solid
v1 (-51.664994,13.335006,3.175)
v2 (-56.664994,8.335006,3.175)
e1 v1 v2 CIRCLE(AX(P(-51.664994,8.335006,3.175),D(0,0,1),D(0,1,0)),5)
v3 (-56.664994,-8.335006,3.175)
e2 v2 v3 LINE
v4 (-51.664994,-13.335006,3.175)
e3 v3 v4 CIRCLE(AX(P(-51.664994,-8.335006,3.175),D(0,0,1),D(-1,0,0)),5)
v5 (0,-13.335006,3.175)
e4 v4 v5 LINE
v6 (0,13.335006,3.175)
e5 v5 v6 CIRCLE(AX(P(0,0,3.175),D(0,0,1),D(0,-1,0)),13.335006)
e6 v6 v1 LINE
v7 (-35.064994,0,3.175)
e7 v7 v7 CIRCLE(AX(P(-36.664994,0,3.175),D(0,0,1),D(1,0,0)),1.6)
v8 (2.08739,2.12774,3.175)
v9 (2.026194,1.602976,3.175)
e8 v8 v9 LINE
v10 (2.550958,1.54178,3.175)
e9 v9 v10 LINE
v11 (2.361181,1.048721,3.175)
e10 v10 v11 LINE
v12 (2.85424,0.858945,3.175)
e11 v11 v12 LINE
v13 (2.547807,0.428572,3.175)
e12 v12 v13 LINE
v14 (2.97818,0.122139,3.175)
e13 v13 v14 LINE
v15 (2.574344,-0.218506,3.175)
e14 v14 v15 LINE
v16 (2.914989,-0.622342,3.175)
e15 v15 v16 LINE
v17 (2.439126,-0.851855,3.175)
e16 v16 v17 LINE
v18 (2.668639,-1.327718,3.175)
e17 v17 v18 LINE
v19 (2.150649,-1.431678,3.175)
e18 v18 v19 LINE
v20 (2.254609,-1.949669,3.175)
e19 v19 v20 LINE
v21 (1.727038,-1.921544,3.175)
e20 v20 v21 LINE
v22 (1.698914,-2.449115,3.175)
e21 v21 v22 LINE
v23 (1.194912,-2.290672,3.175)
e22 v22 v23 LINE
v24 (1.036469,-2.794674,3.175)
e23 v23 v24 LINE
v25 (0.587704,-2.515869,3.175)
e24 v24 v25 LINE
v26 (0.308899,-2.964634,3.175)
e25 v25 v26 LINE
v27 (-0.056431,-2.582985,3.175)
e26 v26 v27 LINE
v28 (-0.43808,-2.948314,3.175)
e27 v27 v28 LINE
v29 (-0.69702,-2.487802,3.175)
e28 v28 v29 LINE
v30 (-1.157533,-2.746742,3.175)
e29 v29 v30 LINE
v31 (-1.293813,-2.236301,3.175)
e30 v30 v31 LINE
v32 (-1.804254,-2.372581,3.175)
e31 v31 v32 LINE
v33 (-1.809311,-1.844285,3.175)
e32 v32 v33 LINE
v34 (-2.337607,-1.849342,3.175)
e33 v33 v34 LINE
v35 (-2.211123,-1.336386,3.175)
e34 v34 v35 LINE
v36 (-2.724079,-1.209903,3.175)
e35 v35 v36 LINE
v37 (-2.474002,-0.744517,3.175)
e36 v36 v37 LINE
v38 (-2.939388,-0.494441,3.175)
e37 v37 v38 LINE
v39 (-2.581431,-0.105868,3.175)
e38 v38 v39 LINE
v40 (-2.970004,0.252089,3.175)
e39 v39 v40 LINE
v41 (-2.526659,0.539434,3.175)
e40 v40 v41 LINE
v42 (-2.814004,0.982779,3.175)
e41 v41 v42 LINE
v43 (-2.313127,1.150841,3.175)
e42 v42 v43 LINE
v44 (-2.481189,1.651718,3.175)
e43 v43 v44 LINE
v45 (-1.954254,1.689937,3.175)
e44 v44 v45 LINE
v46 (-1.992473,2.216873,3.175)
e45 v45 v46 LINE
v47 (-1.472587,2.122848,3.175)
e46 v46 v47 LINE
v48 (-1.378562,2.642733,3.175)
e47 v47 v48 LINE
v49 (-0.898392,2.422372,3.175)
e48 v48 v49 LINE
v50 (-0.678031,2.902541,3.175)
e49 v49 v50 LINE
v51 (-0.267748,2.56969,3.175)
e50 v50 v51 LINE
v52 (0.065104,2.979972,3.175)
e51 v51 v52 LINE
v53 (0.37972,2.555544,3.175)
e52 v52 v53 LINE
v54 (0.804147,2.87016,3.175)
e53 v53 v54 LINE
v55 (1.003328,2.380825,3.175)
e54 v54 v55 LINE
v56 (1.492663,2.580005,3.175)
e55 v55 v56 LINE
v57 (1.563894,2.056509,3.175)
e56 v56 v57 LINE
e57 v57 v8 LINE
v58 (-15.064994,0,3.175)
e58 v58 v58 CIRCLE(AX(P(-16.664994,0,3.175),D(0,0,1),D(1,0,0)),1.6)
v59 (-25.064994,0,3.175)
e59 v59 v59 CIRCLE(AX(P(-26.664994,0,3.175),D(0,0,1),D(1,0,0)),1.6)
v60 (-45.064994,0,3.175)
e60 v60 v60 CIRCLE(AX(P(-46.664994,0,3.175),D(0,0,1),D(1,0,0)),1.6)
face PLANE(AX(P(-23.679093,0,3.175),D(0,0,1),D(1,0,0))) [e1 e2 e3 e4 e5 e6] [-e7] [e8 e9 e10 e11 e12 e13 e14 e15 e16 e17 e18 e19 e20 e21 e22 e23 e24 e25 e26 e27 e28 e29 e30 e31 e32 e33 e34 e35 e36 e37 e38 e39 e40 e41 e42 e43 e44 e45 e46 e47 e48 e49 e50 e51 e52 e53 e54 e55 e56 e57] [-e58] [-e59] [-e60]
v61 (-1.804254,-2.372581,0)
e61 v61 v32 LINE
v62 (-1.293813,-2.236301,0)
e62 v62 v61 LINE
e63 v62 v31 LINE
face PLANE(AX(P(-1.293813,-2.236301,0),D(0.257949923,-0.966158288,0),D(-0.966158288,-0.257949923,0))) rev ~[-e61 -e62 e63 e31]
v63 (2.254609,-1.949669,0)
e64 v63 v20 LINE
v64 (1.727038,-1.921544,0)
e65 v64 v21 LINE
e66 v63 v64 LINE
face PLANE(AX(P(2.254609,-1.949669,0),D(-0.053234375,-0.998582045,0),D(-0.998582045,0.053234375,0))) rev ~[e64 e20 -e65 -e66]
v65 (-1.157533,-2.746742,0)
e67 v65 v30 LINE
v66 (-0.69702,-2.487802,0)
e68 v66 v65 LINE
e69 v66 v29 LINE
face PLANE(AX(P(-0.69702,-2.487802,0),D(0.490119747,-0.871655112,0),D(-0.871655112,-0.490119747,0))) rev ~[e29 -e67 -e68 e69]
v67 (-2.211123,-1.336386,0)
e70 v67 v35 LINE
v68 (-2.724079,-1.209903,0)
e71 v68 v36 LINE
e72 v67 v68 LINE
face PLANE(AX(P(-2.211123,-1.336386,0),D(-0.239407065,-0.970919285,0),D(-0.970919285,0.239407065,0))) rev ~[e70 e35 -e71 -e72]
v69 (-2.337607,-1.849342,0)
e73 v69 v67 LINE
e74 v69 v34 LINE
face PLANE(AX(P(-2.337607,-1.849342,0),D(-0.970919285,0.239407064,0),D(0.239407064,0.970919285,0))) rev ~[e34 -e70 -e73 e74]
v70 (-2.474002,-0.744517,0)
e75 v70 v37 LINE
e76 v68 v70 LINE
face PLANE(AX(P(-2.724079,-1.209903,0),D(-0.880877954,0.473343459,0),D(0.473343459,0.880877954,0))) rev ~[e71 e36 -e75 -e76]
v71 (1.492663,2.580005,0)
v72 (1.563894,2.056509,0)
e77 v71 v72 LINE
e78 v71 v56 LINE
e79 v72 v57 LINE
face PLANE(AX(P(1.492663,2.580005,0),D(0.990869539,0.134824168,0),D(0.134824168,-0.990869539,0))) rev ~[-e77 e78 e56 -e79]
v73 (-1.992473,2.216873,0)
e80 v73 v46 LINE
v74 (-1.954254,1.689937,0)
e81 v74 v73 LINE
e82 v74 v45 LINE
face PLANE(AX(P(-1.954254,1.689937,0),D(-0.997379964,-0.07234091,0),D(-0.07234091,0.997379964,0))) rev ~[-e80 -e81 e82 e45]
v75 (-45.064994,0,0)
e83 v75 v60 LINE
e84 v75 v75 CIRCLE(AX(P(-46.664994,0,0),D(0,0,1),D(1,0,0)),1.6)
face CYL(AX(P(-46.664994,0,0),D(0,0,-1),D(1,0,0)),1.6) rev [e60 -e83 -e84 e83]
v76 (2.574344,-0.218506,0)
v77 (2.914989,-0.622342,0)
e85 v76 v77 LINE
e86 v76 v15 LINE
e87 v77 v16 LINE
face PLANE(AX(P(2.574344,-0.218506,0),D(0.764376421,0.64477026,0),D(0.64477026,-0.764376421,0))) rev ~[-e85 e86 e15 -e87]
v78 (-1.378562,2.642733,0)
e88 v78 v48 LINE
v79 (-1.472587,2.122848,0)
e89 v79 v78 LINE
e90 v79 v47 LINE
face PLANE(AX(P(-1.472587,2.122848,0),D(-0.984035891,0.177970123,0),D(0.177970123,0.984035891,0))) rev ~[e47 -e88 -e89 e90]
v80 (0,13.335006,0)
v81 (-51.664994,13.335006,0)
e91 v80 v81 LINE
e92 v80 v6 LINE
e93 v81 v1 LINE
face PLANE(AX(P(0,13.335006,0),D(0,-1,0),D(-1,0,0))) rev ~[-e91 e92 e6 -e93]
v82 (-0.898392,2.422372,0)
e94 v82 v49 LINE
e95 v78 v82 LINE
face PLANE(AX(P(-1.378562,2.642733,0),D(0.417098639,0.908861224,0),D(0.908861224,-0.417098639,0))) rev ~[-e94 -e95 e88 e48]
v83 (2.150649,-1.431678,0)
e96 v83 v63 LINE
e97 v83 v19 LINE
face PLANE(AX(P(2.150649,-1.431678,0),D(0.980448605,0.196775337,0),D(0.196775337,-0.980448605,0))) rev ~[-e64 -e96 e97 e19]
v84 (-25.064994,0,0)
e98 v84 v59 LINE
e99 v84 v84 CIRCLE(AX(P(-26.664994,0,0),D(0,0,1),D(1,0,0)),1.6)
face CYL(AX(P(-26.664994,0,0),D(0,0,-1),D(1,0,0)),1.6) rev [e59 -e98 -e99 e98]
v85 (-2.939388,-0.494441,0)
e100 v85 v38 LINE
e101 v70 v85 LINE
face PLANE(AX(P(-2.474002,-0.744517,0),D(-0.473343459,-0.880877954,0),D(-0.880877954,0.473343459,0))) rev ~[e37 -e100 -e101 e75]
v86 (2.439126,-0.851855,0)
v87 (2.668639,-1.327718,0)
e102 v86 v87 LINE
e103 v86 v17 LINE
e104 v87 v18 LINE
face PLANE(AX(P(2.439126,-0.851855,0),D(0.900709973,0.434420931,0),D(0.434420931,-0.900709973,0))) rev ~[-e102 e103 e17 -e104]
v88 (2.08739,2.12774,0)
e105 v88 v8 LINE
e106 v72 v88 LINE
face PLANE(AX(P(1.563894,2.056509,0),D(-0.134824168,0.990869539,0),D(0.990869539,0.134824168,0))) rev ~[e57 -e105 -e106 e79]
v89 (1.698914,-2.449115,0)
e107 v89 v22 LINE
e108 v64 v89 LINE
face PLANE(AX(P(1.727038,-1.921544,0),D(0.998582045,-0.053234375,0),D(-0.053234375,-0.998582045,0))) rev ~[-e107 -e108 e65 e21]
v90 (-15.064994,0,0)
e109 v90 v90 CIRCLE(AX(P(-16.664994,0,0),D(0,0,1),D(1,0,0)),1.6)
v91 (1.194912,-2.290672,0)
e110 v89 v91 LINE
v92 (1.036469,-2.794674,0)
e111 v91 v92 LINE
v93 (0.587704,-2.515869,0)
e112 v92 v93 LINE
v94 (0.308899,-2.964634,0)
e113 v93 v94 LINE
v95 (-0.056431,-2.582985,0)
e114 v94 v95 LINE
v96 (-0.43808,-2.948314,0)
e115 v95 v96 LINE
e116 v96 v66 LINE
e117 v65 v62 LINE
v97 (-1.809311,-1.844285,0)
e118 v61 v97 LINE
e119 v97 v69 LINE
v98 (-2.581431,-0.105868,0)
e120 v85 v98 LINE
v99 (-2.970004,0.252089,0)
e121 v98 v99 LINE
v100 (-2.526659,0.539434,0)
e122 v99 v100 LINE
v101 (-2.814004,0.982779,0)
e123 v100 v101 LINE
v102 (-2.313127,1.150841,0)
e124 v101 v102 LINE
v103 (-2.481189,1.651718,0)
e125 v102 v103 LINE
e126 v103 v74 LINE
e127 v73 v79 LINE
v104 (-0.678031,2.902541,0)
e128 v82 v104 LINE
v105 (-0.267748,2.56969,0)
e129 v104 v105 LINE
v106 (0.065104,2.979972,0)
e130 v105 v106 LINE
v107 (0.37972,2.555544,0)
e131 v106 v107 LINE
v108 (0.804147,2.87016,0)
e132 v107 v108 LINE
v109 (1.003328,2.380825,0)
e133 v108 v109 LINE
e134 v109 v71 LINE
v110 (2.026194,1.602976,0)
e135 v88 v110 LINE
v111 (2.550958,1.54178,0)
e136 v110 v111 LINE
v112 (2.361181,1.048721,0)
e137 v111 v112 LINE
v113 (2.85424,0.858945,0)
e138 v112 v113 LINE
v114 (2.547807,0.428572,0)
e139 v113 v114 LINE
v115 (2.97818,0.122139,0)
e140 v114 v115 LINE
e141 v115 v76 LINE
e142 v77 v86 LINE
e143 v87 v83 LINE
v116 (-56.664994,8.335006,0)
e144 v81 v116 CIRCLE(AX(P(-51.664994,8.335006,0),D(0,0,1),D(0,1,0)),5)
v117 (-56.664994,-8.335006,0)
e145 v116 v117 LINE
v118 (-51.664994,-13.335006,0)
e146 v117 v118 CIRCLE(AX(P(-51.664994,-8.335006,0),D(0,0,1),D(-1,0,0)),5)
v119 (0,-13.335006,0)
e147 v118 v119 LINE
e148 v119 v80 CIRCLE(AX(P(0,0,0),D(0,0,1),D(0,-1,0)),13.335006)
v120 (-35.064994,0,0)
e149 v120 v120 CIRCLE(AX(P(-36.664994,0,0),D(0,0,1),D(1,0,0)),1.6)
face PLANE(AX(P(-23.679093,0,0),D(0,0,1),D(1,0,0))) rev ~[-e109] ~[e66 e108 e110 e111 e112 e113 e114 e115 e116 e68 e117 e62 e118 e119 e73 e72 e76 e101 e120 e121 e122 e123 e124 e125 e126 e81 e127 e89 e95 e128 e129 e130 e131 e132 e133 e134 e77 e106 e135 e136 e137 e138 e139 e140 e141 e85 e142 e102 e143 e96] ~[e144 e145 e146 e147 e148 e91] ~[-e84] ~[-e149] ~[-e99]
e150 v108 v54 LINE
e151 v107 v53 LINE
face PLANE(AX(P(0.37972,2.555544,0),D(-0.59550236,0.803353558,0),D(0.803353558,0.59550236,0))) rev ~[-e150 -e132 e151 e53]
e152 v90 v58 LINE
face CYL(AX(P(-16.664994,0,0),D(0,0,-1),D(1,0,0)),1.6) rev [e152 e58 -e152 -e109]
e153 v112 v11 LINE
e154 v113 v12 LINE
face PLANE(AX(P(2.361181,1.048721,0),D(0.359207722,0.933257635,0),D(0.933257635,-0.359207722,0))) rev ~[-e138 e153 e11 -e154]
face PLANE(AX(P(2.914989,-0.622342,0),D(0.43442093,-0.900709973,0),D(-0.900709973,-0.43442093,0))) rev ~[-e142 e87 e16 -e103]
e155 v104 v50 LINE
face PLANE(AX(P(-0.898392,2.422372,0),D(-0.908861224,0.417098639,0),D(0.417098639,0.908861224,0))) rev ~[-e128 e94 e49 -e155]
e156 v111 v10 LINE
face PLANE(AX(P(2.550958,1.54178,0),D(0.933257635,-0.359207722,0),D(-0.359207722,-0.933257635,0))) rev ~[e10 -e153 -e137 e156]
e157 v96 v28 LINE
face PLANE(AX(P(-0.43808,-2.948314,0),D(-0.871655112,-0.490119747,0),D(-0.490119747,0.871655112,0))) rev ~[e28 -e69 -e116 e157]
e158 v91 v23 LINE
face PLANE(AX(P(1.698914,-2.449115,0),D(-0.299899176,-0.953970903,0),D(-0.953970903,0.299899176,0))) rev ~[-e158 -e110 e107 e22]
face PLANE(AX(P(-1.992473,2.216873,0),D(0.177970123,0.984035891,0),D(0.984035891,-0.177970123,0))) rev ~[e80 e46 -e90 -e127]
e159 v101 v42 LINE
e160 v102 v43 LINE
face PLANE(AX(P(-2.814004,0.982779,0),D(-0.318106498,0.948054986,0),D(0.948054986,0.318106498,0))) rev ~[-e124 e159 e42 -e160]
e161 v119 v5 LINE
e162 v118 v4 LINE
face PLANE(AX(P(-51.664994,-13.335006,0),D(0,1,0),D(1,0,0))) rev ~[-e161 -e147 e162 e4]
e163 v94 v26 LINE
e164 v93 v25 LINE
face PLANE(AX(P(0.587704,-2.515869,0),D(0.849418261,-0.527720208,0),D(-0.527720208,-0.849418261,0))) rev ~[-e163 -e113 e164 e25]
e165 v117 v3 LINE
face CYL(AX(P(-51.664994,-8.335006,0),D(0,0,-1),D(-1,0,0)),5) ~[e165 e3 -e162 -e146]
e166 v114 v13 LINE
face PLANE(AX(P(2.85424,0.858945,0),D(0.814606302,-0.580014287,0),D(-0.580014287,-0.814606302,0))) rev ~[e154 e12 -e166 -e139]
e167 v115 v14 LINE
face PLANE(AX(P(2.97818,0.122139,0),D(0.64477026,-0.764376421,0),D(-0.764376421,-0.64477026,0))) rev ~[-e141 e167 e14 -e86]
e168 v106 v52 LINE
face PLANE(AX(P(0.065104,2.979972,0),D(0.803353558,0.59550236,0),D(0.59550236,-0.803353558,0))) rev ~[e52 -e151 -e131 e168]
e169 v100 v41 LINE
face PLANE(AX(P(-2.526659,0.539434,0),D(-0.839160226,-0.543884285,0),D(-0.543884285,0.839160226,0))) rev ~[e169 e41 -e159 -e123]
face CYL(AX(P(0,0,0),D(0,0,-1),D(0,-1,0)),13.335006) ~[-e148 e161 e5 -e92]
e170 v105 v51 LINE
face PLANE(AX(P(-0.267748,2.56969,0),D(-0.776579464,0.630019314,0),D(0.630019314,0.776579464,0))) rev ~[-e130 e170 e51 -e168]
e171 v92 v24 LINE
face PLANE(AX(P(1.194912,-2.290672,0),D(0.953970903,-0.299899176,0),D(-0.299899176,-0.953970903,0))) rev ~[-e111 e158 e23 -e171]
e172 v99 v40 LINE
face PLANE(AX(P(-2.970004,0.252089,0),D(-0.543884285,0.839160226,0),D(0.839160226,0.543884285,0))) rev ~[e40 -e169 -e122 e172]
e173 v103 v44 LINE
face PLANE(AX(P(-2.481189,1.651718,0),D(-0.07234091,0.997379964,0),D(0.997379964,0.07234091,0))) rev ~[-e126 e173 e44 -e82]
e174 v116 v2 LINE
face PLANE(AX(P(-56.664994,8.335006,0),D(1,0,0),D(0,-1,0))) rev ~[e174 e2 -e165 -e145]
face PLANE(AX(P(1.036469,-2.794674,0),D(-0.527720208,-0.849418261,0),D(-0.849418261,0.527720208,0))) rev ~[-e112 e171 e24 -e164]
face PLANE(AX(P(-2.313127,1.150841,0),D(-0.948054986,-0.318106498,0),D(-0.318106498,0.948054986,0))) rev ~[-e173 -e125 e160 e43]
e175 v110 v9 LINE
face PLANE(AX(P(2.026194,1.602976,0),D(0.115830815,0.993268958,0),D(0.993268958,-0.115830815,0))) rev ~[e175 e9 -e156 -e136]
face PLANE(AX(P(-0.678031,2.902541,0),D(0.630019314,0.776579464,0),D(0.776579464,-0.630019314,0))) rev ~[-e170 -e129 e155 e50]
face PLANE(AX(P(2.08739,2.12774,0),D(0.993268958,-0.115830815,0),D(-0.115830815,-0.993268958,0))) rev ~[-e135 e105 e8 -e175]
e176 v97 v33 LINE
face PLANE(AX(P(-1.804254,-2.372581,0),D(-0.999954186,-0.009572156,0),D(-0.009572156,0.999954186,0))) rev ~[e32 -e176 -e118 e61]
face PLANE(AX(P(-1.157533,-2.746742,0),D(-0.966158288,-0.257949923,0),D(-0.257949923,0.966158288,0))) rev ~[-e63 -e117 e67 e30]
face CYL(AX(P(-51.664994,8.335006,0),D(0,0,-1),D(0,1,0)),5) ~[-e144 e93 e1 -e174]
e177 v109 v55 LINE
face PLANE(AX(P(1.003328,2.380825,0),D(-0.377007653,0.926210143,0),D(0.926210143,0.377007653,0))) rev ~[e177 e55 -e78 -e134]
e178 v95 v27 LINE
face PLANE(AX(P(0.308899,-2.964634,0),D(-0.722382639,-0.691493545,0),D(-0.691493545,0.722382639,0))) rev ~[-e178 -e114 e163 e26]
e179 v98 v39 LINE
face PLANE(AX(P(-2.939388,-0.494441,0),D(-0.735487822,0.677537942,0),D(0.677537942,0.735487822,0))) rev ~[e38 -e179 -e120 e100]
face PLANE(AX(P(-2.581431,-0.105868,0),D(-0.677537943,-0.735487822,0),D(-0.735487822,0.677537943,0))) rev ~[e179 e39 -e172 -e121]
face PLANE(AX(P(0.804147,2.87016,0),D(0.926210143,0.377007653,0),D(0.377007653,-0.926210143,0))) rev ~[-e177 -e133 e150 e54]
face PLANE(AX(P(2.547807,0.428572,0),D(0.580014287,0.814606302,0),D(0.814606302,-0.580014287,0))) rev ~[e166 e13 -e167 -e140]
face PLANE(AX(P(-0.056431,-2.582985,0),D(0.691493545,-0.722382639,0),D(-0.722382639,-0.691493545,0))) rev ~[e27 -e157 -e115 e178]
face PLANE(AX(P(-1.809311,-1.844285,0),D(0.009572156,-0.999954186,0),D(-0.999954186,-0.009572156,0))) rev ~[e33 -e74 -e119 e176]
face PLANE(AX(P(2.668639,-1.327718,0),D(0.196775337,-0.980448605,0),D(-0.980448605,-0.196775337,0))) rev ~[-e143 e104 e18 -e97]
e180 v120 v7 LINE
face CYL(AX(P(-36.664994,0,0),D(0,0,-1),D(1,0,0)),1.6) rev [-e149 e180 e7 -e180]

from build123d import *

# Parameters (mm, degrees)
F0_R     = 1.6
F1_DEPTH = 3.175


with BuildPart() as f1:
    # F0 (on Top) → F1 (new body)
    with BuildSketch(Plane.XY):
        with BuildLine():
            Line((-51.6649944294, -13.3350055706), (0, -13.3350055706))
            ThreePointArc((0, -13.3350055706), (13.3350055706, 0), (0, 13.3350055706))
            Line((0, 13.3350055706), (-51.6649944294, 13.3350055706))
            ThreePointArc((-51.6649944294, 13.3350055706), (-55.2005283353, 11.8705394766), (-56.6649944294, 8.3350055706))
            Line((-56.6649944294, 8.3350055706), (-56.6649944294, -8.3350055706))
            ThreePointArc((-56.6649944294, -8.3350055706), (-55.2005283353, -11.8705394766), (-51.6649944294, -13.3350055706))
        make_face()
        with Locations((-46.6649944294, 0)):
            Circle(F0_R, mode=Mode.SUBTRACT)
        with Locations((-36.6649944294, 0)):
            Circle(F0_R, mode=Mode.SUBTRACT)
        with Locations((-26.6649944294, 0)):
            Circle(F0_R, mode=Mode.SUBTRACT)
        with Locations((-16.6649944294, 0)):
            Circle(F0_R, mode=Mode.SUBTRACT)
        Polygon((-2.3131272616, 1.150841372), (-2.4811892868, 1.651717782), (-1.9542535042, 1.6899369317), (-1.992472654, 2.2168727143), (-1.4725868119, 2.1228475389), (-1.3785616365, 2.6427333809), (-0.8983920744, 2.4223718279), (-0.6780305213, 2.90254139), (-0.2677480588, 2.5696895861), (0.0651037451, 2.9799720486), (0.379719552, 2.555544297), (0.8041473037, 2.8701601039), (1.0033279869, 2.380824761), (1.4926633298, 2.5800054442), (1.5638936344, 2.0565092492), (2.0873898293, 2.1277395538), (2.0261940932, 1.6029756981), (2.5509579489, 1.5417799619), (2.3611813253, 1.0487212884), (2.8542399989, 0.8589446648), (2.547806851, 0.4285718633), (2.9781796525, 0.1221387154), (2.574344302, -0.2185063082), (2.9149893256, -0.6223416587), (2.4391262327, -0.8518549247), (2.6686394987, -1.3277180175), (2.1506488918, -1.4316783634), (2.2546092377, -1.9496689703), (1.7270383715, -1.9215441851), (1.6989135863, -2.4491150513), (1.1949116786, -2.2906723188), (1.0364689461, -2.7946742265), (0.5877042905, -2.5158690862), (0.3088991502, -2.9646337418), (-0.0564307197, -2.5829845462), (-0.4380799154, -2.9483144161), (-0.6970199802, -2.4878015876), (-1.1575328087, -2.7467416524), (-1.2938129119, -2.2363009057), (-1.8042536586, -2.3725810089), (-1.80931082, -1.8442852134), (-2.3376066155, -1.8493423749), (-2.2111230752, -1.3363862984), (-2.7240791517, -1.209902758), (-2.4740023355, -0.7445173173), (-2.9393877762, -0.4944405012), (-2.5814309304, -0.105867575), (-2.9700038565, 0.2520892708), (-2.5266587261, 0.5394342163), (-2.8140036716, 0.9827793468), align=None, mode=Mode.SUBTRACT)
    extrude(amount=F1_DEPTH)


solid = f1.part
